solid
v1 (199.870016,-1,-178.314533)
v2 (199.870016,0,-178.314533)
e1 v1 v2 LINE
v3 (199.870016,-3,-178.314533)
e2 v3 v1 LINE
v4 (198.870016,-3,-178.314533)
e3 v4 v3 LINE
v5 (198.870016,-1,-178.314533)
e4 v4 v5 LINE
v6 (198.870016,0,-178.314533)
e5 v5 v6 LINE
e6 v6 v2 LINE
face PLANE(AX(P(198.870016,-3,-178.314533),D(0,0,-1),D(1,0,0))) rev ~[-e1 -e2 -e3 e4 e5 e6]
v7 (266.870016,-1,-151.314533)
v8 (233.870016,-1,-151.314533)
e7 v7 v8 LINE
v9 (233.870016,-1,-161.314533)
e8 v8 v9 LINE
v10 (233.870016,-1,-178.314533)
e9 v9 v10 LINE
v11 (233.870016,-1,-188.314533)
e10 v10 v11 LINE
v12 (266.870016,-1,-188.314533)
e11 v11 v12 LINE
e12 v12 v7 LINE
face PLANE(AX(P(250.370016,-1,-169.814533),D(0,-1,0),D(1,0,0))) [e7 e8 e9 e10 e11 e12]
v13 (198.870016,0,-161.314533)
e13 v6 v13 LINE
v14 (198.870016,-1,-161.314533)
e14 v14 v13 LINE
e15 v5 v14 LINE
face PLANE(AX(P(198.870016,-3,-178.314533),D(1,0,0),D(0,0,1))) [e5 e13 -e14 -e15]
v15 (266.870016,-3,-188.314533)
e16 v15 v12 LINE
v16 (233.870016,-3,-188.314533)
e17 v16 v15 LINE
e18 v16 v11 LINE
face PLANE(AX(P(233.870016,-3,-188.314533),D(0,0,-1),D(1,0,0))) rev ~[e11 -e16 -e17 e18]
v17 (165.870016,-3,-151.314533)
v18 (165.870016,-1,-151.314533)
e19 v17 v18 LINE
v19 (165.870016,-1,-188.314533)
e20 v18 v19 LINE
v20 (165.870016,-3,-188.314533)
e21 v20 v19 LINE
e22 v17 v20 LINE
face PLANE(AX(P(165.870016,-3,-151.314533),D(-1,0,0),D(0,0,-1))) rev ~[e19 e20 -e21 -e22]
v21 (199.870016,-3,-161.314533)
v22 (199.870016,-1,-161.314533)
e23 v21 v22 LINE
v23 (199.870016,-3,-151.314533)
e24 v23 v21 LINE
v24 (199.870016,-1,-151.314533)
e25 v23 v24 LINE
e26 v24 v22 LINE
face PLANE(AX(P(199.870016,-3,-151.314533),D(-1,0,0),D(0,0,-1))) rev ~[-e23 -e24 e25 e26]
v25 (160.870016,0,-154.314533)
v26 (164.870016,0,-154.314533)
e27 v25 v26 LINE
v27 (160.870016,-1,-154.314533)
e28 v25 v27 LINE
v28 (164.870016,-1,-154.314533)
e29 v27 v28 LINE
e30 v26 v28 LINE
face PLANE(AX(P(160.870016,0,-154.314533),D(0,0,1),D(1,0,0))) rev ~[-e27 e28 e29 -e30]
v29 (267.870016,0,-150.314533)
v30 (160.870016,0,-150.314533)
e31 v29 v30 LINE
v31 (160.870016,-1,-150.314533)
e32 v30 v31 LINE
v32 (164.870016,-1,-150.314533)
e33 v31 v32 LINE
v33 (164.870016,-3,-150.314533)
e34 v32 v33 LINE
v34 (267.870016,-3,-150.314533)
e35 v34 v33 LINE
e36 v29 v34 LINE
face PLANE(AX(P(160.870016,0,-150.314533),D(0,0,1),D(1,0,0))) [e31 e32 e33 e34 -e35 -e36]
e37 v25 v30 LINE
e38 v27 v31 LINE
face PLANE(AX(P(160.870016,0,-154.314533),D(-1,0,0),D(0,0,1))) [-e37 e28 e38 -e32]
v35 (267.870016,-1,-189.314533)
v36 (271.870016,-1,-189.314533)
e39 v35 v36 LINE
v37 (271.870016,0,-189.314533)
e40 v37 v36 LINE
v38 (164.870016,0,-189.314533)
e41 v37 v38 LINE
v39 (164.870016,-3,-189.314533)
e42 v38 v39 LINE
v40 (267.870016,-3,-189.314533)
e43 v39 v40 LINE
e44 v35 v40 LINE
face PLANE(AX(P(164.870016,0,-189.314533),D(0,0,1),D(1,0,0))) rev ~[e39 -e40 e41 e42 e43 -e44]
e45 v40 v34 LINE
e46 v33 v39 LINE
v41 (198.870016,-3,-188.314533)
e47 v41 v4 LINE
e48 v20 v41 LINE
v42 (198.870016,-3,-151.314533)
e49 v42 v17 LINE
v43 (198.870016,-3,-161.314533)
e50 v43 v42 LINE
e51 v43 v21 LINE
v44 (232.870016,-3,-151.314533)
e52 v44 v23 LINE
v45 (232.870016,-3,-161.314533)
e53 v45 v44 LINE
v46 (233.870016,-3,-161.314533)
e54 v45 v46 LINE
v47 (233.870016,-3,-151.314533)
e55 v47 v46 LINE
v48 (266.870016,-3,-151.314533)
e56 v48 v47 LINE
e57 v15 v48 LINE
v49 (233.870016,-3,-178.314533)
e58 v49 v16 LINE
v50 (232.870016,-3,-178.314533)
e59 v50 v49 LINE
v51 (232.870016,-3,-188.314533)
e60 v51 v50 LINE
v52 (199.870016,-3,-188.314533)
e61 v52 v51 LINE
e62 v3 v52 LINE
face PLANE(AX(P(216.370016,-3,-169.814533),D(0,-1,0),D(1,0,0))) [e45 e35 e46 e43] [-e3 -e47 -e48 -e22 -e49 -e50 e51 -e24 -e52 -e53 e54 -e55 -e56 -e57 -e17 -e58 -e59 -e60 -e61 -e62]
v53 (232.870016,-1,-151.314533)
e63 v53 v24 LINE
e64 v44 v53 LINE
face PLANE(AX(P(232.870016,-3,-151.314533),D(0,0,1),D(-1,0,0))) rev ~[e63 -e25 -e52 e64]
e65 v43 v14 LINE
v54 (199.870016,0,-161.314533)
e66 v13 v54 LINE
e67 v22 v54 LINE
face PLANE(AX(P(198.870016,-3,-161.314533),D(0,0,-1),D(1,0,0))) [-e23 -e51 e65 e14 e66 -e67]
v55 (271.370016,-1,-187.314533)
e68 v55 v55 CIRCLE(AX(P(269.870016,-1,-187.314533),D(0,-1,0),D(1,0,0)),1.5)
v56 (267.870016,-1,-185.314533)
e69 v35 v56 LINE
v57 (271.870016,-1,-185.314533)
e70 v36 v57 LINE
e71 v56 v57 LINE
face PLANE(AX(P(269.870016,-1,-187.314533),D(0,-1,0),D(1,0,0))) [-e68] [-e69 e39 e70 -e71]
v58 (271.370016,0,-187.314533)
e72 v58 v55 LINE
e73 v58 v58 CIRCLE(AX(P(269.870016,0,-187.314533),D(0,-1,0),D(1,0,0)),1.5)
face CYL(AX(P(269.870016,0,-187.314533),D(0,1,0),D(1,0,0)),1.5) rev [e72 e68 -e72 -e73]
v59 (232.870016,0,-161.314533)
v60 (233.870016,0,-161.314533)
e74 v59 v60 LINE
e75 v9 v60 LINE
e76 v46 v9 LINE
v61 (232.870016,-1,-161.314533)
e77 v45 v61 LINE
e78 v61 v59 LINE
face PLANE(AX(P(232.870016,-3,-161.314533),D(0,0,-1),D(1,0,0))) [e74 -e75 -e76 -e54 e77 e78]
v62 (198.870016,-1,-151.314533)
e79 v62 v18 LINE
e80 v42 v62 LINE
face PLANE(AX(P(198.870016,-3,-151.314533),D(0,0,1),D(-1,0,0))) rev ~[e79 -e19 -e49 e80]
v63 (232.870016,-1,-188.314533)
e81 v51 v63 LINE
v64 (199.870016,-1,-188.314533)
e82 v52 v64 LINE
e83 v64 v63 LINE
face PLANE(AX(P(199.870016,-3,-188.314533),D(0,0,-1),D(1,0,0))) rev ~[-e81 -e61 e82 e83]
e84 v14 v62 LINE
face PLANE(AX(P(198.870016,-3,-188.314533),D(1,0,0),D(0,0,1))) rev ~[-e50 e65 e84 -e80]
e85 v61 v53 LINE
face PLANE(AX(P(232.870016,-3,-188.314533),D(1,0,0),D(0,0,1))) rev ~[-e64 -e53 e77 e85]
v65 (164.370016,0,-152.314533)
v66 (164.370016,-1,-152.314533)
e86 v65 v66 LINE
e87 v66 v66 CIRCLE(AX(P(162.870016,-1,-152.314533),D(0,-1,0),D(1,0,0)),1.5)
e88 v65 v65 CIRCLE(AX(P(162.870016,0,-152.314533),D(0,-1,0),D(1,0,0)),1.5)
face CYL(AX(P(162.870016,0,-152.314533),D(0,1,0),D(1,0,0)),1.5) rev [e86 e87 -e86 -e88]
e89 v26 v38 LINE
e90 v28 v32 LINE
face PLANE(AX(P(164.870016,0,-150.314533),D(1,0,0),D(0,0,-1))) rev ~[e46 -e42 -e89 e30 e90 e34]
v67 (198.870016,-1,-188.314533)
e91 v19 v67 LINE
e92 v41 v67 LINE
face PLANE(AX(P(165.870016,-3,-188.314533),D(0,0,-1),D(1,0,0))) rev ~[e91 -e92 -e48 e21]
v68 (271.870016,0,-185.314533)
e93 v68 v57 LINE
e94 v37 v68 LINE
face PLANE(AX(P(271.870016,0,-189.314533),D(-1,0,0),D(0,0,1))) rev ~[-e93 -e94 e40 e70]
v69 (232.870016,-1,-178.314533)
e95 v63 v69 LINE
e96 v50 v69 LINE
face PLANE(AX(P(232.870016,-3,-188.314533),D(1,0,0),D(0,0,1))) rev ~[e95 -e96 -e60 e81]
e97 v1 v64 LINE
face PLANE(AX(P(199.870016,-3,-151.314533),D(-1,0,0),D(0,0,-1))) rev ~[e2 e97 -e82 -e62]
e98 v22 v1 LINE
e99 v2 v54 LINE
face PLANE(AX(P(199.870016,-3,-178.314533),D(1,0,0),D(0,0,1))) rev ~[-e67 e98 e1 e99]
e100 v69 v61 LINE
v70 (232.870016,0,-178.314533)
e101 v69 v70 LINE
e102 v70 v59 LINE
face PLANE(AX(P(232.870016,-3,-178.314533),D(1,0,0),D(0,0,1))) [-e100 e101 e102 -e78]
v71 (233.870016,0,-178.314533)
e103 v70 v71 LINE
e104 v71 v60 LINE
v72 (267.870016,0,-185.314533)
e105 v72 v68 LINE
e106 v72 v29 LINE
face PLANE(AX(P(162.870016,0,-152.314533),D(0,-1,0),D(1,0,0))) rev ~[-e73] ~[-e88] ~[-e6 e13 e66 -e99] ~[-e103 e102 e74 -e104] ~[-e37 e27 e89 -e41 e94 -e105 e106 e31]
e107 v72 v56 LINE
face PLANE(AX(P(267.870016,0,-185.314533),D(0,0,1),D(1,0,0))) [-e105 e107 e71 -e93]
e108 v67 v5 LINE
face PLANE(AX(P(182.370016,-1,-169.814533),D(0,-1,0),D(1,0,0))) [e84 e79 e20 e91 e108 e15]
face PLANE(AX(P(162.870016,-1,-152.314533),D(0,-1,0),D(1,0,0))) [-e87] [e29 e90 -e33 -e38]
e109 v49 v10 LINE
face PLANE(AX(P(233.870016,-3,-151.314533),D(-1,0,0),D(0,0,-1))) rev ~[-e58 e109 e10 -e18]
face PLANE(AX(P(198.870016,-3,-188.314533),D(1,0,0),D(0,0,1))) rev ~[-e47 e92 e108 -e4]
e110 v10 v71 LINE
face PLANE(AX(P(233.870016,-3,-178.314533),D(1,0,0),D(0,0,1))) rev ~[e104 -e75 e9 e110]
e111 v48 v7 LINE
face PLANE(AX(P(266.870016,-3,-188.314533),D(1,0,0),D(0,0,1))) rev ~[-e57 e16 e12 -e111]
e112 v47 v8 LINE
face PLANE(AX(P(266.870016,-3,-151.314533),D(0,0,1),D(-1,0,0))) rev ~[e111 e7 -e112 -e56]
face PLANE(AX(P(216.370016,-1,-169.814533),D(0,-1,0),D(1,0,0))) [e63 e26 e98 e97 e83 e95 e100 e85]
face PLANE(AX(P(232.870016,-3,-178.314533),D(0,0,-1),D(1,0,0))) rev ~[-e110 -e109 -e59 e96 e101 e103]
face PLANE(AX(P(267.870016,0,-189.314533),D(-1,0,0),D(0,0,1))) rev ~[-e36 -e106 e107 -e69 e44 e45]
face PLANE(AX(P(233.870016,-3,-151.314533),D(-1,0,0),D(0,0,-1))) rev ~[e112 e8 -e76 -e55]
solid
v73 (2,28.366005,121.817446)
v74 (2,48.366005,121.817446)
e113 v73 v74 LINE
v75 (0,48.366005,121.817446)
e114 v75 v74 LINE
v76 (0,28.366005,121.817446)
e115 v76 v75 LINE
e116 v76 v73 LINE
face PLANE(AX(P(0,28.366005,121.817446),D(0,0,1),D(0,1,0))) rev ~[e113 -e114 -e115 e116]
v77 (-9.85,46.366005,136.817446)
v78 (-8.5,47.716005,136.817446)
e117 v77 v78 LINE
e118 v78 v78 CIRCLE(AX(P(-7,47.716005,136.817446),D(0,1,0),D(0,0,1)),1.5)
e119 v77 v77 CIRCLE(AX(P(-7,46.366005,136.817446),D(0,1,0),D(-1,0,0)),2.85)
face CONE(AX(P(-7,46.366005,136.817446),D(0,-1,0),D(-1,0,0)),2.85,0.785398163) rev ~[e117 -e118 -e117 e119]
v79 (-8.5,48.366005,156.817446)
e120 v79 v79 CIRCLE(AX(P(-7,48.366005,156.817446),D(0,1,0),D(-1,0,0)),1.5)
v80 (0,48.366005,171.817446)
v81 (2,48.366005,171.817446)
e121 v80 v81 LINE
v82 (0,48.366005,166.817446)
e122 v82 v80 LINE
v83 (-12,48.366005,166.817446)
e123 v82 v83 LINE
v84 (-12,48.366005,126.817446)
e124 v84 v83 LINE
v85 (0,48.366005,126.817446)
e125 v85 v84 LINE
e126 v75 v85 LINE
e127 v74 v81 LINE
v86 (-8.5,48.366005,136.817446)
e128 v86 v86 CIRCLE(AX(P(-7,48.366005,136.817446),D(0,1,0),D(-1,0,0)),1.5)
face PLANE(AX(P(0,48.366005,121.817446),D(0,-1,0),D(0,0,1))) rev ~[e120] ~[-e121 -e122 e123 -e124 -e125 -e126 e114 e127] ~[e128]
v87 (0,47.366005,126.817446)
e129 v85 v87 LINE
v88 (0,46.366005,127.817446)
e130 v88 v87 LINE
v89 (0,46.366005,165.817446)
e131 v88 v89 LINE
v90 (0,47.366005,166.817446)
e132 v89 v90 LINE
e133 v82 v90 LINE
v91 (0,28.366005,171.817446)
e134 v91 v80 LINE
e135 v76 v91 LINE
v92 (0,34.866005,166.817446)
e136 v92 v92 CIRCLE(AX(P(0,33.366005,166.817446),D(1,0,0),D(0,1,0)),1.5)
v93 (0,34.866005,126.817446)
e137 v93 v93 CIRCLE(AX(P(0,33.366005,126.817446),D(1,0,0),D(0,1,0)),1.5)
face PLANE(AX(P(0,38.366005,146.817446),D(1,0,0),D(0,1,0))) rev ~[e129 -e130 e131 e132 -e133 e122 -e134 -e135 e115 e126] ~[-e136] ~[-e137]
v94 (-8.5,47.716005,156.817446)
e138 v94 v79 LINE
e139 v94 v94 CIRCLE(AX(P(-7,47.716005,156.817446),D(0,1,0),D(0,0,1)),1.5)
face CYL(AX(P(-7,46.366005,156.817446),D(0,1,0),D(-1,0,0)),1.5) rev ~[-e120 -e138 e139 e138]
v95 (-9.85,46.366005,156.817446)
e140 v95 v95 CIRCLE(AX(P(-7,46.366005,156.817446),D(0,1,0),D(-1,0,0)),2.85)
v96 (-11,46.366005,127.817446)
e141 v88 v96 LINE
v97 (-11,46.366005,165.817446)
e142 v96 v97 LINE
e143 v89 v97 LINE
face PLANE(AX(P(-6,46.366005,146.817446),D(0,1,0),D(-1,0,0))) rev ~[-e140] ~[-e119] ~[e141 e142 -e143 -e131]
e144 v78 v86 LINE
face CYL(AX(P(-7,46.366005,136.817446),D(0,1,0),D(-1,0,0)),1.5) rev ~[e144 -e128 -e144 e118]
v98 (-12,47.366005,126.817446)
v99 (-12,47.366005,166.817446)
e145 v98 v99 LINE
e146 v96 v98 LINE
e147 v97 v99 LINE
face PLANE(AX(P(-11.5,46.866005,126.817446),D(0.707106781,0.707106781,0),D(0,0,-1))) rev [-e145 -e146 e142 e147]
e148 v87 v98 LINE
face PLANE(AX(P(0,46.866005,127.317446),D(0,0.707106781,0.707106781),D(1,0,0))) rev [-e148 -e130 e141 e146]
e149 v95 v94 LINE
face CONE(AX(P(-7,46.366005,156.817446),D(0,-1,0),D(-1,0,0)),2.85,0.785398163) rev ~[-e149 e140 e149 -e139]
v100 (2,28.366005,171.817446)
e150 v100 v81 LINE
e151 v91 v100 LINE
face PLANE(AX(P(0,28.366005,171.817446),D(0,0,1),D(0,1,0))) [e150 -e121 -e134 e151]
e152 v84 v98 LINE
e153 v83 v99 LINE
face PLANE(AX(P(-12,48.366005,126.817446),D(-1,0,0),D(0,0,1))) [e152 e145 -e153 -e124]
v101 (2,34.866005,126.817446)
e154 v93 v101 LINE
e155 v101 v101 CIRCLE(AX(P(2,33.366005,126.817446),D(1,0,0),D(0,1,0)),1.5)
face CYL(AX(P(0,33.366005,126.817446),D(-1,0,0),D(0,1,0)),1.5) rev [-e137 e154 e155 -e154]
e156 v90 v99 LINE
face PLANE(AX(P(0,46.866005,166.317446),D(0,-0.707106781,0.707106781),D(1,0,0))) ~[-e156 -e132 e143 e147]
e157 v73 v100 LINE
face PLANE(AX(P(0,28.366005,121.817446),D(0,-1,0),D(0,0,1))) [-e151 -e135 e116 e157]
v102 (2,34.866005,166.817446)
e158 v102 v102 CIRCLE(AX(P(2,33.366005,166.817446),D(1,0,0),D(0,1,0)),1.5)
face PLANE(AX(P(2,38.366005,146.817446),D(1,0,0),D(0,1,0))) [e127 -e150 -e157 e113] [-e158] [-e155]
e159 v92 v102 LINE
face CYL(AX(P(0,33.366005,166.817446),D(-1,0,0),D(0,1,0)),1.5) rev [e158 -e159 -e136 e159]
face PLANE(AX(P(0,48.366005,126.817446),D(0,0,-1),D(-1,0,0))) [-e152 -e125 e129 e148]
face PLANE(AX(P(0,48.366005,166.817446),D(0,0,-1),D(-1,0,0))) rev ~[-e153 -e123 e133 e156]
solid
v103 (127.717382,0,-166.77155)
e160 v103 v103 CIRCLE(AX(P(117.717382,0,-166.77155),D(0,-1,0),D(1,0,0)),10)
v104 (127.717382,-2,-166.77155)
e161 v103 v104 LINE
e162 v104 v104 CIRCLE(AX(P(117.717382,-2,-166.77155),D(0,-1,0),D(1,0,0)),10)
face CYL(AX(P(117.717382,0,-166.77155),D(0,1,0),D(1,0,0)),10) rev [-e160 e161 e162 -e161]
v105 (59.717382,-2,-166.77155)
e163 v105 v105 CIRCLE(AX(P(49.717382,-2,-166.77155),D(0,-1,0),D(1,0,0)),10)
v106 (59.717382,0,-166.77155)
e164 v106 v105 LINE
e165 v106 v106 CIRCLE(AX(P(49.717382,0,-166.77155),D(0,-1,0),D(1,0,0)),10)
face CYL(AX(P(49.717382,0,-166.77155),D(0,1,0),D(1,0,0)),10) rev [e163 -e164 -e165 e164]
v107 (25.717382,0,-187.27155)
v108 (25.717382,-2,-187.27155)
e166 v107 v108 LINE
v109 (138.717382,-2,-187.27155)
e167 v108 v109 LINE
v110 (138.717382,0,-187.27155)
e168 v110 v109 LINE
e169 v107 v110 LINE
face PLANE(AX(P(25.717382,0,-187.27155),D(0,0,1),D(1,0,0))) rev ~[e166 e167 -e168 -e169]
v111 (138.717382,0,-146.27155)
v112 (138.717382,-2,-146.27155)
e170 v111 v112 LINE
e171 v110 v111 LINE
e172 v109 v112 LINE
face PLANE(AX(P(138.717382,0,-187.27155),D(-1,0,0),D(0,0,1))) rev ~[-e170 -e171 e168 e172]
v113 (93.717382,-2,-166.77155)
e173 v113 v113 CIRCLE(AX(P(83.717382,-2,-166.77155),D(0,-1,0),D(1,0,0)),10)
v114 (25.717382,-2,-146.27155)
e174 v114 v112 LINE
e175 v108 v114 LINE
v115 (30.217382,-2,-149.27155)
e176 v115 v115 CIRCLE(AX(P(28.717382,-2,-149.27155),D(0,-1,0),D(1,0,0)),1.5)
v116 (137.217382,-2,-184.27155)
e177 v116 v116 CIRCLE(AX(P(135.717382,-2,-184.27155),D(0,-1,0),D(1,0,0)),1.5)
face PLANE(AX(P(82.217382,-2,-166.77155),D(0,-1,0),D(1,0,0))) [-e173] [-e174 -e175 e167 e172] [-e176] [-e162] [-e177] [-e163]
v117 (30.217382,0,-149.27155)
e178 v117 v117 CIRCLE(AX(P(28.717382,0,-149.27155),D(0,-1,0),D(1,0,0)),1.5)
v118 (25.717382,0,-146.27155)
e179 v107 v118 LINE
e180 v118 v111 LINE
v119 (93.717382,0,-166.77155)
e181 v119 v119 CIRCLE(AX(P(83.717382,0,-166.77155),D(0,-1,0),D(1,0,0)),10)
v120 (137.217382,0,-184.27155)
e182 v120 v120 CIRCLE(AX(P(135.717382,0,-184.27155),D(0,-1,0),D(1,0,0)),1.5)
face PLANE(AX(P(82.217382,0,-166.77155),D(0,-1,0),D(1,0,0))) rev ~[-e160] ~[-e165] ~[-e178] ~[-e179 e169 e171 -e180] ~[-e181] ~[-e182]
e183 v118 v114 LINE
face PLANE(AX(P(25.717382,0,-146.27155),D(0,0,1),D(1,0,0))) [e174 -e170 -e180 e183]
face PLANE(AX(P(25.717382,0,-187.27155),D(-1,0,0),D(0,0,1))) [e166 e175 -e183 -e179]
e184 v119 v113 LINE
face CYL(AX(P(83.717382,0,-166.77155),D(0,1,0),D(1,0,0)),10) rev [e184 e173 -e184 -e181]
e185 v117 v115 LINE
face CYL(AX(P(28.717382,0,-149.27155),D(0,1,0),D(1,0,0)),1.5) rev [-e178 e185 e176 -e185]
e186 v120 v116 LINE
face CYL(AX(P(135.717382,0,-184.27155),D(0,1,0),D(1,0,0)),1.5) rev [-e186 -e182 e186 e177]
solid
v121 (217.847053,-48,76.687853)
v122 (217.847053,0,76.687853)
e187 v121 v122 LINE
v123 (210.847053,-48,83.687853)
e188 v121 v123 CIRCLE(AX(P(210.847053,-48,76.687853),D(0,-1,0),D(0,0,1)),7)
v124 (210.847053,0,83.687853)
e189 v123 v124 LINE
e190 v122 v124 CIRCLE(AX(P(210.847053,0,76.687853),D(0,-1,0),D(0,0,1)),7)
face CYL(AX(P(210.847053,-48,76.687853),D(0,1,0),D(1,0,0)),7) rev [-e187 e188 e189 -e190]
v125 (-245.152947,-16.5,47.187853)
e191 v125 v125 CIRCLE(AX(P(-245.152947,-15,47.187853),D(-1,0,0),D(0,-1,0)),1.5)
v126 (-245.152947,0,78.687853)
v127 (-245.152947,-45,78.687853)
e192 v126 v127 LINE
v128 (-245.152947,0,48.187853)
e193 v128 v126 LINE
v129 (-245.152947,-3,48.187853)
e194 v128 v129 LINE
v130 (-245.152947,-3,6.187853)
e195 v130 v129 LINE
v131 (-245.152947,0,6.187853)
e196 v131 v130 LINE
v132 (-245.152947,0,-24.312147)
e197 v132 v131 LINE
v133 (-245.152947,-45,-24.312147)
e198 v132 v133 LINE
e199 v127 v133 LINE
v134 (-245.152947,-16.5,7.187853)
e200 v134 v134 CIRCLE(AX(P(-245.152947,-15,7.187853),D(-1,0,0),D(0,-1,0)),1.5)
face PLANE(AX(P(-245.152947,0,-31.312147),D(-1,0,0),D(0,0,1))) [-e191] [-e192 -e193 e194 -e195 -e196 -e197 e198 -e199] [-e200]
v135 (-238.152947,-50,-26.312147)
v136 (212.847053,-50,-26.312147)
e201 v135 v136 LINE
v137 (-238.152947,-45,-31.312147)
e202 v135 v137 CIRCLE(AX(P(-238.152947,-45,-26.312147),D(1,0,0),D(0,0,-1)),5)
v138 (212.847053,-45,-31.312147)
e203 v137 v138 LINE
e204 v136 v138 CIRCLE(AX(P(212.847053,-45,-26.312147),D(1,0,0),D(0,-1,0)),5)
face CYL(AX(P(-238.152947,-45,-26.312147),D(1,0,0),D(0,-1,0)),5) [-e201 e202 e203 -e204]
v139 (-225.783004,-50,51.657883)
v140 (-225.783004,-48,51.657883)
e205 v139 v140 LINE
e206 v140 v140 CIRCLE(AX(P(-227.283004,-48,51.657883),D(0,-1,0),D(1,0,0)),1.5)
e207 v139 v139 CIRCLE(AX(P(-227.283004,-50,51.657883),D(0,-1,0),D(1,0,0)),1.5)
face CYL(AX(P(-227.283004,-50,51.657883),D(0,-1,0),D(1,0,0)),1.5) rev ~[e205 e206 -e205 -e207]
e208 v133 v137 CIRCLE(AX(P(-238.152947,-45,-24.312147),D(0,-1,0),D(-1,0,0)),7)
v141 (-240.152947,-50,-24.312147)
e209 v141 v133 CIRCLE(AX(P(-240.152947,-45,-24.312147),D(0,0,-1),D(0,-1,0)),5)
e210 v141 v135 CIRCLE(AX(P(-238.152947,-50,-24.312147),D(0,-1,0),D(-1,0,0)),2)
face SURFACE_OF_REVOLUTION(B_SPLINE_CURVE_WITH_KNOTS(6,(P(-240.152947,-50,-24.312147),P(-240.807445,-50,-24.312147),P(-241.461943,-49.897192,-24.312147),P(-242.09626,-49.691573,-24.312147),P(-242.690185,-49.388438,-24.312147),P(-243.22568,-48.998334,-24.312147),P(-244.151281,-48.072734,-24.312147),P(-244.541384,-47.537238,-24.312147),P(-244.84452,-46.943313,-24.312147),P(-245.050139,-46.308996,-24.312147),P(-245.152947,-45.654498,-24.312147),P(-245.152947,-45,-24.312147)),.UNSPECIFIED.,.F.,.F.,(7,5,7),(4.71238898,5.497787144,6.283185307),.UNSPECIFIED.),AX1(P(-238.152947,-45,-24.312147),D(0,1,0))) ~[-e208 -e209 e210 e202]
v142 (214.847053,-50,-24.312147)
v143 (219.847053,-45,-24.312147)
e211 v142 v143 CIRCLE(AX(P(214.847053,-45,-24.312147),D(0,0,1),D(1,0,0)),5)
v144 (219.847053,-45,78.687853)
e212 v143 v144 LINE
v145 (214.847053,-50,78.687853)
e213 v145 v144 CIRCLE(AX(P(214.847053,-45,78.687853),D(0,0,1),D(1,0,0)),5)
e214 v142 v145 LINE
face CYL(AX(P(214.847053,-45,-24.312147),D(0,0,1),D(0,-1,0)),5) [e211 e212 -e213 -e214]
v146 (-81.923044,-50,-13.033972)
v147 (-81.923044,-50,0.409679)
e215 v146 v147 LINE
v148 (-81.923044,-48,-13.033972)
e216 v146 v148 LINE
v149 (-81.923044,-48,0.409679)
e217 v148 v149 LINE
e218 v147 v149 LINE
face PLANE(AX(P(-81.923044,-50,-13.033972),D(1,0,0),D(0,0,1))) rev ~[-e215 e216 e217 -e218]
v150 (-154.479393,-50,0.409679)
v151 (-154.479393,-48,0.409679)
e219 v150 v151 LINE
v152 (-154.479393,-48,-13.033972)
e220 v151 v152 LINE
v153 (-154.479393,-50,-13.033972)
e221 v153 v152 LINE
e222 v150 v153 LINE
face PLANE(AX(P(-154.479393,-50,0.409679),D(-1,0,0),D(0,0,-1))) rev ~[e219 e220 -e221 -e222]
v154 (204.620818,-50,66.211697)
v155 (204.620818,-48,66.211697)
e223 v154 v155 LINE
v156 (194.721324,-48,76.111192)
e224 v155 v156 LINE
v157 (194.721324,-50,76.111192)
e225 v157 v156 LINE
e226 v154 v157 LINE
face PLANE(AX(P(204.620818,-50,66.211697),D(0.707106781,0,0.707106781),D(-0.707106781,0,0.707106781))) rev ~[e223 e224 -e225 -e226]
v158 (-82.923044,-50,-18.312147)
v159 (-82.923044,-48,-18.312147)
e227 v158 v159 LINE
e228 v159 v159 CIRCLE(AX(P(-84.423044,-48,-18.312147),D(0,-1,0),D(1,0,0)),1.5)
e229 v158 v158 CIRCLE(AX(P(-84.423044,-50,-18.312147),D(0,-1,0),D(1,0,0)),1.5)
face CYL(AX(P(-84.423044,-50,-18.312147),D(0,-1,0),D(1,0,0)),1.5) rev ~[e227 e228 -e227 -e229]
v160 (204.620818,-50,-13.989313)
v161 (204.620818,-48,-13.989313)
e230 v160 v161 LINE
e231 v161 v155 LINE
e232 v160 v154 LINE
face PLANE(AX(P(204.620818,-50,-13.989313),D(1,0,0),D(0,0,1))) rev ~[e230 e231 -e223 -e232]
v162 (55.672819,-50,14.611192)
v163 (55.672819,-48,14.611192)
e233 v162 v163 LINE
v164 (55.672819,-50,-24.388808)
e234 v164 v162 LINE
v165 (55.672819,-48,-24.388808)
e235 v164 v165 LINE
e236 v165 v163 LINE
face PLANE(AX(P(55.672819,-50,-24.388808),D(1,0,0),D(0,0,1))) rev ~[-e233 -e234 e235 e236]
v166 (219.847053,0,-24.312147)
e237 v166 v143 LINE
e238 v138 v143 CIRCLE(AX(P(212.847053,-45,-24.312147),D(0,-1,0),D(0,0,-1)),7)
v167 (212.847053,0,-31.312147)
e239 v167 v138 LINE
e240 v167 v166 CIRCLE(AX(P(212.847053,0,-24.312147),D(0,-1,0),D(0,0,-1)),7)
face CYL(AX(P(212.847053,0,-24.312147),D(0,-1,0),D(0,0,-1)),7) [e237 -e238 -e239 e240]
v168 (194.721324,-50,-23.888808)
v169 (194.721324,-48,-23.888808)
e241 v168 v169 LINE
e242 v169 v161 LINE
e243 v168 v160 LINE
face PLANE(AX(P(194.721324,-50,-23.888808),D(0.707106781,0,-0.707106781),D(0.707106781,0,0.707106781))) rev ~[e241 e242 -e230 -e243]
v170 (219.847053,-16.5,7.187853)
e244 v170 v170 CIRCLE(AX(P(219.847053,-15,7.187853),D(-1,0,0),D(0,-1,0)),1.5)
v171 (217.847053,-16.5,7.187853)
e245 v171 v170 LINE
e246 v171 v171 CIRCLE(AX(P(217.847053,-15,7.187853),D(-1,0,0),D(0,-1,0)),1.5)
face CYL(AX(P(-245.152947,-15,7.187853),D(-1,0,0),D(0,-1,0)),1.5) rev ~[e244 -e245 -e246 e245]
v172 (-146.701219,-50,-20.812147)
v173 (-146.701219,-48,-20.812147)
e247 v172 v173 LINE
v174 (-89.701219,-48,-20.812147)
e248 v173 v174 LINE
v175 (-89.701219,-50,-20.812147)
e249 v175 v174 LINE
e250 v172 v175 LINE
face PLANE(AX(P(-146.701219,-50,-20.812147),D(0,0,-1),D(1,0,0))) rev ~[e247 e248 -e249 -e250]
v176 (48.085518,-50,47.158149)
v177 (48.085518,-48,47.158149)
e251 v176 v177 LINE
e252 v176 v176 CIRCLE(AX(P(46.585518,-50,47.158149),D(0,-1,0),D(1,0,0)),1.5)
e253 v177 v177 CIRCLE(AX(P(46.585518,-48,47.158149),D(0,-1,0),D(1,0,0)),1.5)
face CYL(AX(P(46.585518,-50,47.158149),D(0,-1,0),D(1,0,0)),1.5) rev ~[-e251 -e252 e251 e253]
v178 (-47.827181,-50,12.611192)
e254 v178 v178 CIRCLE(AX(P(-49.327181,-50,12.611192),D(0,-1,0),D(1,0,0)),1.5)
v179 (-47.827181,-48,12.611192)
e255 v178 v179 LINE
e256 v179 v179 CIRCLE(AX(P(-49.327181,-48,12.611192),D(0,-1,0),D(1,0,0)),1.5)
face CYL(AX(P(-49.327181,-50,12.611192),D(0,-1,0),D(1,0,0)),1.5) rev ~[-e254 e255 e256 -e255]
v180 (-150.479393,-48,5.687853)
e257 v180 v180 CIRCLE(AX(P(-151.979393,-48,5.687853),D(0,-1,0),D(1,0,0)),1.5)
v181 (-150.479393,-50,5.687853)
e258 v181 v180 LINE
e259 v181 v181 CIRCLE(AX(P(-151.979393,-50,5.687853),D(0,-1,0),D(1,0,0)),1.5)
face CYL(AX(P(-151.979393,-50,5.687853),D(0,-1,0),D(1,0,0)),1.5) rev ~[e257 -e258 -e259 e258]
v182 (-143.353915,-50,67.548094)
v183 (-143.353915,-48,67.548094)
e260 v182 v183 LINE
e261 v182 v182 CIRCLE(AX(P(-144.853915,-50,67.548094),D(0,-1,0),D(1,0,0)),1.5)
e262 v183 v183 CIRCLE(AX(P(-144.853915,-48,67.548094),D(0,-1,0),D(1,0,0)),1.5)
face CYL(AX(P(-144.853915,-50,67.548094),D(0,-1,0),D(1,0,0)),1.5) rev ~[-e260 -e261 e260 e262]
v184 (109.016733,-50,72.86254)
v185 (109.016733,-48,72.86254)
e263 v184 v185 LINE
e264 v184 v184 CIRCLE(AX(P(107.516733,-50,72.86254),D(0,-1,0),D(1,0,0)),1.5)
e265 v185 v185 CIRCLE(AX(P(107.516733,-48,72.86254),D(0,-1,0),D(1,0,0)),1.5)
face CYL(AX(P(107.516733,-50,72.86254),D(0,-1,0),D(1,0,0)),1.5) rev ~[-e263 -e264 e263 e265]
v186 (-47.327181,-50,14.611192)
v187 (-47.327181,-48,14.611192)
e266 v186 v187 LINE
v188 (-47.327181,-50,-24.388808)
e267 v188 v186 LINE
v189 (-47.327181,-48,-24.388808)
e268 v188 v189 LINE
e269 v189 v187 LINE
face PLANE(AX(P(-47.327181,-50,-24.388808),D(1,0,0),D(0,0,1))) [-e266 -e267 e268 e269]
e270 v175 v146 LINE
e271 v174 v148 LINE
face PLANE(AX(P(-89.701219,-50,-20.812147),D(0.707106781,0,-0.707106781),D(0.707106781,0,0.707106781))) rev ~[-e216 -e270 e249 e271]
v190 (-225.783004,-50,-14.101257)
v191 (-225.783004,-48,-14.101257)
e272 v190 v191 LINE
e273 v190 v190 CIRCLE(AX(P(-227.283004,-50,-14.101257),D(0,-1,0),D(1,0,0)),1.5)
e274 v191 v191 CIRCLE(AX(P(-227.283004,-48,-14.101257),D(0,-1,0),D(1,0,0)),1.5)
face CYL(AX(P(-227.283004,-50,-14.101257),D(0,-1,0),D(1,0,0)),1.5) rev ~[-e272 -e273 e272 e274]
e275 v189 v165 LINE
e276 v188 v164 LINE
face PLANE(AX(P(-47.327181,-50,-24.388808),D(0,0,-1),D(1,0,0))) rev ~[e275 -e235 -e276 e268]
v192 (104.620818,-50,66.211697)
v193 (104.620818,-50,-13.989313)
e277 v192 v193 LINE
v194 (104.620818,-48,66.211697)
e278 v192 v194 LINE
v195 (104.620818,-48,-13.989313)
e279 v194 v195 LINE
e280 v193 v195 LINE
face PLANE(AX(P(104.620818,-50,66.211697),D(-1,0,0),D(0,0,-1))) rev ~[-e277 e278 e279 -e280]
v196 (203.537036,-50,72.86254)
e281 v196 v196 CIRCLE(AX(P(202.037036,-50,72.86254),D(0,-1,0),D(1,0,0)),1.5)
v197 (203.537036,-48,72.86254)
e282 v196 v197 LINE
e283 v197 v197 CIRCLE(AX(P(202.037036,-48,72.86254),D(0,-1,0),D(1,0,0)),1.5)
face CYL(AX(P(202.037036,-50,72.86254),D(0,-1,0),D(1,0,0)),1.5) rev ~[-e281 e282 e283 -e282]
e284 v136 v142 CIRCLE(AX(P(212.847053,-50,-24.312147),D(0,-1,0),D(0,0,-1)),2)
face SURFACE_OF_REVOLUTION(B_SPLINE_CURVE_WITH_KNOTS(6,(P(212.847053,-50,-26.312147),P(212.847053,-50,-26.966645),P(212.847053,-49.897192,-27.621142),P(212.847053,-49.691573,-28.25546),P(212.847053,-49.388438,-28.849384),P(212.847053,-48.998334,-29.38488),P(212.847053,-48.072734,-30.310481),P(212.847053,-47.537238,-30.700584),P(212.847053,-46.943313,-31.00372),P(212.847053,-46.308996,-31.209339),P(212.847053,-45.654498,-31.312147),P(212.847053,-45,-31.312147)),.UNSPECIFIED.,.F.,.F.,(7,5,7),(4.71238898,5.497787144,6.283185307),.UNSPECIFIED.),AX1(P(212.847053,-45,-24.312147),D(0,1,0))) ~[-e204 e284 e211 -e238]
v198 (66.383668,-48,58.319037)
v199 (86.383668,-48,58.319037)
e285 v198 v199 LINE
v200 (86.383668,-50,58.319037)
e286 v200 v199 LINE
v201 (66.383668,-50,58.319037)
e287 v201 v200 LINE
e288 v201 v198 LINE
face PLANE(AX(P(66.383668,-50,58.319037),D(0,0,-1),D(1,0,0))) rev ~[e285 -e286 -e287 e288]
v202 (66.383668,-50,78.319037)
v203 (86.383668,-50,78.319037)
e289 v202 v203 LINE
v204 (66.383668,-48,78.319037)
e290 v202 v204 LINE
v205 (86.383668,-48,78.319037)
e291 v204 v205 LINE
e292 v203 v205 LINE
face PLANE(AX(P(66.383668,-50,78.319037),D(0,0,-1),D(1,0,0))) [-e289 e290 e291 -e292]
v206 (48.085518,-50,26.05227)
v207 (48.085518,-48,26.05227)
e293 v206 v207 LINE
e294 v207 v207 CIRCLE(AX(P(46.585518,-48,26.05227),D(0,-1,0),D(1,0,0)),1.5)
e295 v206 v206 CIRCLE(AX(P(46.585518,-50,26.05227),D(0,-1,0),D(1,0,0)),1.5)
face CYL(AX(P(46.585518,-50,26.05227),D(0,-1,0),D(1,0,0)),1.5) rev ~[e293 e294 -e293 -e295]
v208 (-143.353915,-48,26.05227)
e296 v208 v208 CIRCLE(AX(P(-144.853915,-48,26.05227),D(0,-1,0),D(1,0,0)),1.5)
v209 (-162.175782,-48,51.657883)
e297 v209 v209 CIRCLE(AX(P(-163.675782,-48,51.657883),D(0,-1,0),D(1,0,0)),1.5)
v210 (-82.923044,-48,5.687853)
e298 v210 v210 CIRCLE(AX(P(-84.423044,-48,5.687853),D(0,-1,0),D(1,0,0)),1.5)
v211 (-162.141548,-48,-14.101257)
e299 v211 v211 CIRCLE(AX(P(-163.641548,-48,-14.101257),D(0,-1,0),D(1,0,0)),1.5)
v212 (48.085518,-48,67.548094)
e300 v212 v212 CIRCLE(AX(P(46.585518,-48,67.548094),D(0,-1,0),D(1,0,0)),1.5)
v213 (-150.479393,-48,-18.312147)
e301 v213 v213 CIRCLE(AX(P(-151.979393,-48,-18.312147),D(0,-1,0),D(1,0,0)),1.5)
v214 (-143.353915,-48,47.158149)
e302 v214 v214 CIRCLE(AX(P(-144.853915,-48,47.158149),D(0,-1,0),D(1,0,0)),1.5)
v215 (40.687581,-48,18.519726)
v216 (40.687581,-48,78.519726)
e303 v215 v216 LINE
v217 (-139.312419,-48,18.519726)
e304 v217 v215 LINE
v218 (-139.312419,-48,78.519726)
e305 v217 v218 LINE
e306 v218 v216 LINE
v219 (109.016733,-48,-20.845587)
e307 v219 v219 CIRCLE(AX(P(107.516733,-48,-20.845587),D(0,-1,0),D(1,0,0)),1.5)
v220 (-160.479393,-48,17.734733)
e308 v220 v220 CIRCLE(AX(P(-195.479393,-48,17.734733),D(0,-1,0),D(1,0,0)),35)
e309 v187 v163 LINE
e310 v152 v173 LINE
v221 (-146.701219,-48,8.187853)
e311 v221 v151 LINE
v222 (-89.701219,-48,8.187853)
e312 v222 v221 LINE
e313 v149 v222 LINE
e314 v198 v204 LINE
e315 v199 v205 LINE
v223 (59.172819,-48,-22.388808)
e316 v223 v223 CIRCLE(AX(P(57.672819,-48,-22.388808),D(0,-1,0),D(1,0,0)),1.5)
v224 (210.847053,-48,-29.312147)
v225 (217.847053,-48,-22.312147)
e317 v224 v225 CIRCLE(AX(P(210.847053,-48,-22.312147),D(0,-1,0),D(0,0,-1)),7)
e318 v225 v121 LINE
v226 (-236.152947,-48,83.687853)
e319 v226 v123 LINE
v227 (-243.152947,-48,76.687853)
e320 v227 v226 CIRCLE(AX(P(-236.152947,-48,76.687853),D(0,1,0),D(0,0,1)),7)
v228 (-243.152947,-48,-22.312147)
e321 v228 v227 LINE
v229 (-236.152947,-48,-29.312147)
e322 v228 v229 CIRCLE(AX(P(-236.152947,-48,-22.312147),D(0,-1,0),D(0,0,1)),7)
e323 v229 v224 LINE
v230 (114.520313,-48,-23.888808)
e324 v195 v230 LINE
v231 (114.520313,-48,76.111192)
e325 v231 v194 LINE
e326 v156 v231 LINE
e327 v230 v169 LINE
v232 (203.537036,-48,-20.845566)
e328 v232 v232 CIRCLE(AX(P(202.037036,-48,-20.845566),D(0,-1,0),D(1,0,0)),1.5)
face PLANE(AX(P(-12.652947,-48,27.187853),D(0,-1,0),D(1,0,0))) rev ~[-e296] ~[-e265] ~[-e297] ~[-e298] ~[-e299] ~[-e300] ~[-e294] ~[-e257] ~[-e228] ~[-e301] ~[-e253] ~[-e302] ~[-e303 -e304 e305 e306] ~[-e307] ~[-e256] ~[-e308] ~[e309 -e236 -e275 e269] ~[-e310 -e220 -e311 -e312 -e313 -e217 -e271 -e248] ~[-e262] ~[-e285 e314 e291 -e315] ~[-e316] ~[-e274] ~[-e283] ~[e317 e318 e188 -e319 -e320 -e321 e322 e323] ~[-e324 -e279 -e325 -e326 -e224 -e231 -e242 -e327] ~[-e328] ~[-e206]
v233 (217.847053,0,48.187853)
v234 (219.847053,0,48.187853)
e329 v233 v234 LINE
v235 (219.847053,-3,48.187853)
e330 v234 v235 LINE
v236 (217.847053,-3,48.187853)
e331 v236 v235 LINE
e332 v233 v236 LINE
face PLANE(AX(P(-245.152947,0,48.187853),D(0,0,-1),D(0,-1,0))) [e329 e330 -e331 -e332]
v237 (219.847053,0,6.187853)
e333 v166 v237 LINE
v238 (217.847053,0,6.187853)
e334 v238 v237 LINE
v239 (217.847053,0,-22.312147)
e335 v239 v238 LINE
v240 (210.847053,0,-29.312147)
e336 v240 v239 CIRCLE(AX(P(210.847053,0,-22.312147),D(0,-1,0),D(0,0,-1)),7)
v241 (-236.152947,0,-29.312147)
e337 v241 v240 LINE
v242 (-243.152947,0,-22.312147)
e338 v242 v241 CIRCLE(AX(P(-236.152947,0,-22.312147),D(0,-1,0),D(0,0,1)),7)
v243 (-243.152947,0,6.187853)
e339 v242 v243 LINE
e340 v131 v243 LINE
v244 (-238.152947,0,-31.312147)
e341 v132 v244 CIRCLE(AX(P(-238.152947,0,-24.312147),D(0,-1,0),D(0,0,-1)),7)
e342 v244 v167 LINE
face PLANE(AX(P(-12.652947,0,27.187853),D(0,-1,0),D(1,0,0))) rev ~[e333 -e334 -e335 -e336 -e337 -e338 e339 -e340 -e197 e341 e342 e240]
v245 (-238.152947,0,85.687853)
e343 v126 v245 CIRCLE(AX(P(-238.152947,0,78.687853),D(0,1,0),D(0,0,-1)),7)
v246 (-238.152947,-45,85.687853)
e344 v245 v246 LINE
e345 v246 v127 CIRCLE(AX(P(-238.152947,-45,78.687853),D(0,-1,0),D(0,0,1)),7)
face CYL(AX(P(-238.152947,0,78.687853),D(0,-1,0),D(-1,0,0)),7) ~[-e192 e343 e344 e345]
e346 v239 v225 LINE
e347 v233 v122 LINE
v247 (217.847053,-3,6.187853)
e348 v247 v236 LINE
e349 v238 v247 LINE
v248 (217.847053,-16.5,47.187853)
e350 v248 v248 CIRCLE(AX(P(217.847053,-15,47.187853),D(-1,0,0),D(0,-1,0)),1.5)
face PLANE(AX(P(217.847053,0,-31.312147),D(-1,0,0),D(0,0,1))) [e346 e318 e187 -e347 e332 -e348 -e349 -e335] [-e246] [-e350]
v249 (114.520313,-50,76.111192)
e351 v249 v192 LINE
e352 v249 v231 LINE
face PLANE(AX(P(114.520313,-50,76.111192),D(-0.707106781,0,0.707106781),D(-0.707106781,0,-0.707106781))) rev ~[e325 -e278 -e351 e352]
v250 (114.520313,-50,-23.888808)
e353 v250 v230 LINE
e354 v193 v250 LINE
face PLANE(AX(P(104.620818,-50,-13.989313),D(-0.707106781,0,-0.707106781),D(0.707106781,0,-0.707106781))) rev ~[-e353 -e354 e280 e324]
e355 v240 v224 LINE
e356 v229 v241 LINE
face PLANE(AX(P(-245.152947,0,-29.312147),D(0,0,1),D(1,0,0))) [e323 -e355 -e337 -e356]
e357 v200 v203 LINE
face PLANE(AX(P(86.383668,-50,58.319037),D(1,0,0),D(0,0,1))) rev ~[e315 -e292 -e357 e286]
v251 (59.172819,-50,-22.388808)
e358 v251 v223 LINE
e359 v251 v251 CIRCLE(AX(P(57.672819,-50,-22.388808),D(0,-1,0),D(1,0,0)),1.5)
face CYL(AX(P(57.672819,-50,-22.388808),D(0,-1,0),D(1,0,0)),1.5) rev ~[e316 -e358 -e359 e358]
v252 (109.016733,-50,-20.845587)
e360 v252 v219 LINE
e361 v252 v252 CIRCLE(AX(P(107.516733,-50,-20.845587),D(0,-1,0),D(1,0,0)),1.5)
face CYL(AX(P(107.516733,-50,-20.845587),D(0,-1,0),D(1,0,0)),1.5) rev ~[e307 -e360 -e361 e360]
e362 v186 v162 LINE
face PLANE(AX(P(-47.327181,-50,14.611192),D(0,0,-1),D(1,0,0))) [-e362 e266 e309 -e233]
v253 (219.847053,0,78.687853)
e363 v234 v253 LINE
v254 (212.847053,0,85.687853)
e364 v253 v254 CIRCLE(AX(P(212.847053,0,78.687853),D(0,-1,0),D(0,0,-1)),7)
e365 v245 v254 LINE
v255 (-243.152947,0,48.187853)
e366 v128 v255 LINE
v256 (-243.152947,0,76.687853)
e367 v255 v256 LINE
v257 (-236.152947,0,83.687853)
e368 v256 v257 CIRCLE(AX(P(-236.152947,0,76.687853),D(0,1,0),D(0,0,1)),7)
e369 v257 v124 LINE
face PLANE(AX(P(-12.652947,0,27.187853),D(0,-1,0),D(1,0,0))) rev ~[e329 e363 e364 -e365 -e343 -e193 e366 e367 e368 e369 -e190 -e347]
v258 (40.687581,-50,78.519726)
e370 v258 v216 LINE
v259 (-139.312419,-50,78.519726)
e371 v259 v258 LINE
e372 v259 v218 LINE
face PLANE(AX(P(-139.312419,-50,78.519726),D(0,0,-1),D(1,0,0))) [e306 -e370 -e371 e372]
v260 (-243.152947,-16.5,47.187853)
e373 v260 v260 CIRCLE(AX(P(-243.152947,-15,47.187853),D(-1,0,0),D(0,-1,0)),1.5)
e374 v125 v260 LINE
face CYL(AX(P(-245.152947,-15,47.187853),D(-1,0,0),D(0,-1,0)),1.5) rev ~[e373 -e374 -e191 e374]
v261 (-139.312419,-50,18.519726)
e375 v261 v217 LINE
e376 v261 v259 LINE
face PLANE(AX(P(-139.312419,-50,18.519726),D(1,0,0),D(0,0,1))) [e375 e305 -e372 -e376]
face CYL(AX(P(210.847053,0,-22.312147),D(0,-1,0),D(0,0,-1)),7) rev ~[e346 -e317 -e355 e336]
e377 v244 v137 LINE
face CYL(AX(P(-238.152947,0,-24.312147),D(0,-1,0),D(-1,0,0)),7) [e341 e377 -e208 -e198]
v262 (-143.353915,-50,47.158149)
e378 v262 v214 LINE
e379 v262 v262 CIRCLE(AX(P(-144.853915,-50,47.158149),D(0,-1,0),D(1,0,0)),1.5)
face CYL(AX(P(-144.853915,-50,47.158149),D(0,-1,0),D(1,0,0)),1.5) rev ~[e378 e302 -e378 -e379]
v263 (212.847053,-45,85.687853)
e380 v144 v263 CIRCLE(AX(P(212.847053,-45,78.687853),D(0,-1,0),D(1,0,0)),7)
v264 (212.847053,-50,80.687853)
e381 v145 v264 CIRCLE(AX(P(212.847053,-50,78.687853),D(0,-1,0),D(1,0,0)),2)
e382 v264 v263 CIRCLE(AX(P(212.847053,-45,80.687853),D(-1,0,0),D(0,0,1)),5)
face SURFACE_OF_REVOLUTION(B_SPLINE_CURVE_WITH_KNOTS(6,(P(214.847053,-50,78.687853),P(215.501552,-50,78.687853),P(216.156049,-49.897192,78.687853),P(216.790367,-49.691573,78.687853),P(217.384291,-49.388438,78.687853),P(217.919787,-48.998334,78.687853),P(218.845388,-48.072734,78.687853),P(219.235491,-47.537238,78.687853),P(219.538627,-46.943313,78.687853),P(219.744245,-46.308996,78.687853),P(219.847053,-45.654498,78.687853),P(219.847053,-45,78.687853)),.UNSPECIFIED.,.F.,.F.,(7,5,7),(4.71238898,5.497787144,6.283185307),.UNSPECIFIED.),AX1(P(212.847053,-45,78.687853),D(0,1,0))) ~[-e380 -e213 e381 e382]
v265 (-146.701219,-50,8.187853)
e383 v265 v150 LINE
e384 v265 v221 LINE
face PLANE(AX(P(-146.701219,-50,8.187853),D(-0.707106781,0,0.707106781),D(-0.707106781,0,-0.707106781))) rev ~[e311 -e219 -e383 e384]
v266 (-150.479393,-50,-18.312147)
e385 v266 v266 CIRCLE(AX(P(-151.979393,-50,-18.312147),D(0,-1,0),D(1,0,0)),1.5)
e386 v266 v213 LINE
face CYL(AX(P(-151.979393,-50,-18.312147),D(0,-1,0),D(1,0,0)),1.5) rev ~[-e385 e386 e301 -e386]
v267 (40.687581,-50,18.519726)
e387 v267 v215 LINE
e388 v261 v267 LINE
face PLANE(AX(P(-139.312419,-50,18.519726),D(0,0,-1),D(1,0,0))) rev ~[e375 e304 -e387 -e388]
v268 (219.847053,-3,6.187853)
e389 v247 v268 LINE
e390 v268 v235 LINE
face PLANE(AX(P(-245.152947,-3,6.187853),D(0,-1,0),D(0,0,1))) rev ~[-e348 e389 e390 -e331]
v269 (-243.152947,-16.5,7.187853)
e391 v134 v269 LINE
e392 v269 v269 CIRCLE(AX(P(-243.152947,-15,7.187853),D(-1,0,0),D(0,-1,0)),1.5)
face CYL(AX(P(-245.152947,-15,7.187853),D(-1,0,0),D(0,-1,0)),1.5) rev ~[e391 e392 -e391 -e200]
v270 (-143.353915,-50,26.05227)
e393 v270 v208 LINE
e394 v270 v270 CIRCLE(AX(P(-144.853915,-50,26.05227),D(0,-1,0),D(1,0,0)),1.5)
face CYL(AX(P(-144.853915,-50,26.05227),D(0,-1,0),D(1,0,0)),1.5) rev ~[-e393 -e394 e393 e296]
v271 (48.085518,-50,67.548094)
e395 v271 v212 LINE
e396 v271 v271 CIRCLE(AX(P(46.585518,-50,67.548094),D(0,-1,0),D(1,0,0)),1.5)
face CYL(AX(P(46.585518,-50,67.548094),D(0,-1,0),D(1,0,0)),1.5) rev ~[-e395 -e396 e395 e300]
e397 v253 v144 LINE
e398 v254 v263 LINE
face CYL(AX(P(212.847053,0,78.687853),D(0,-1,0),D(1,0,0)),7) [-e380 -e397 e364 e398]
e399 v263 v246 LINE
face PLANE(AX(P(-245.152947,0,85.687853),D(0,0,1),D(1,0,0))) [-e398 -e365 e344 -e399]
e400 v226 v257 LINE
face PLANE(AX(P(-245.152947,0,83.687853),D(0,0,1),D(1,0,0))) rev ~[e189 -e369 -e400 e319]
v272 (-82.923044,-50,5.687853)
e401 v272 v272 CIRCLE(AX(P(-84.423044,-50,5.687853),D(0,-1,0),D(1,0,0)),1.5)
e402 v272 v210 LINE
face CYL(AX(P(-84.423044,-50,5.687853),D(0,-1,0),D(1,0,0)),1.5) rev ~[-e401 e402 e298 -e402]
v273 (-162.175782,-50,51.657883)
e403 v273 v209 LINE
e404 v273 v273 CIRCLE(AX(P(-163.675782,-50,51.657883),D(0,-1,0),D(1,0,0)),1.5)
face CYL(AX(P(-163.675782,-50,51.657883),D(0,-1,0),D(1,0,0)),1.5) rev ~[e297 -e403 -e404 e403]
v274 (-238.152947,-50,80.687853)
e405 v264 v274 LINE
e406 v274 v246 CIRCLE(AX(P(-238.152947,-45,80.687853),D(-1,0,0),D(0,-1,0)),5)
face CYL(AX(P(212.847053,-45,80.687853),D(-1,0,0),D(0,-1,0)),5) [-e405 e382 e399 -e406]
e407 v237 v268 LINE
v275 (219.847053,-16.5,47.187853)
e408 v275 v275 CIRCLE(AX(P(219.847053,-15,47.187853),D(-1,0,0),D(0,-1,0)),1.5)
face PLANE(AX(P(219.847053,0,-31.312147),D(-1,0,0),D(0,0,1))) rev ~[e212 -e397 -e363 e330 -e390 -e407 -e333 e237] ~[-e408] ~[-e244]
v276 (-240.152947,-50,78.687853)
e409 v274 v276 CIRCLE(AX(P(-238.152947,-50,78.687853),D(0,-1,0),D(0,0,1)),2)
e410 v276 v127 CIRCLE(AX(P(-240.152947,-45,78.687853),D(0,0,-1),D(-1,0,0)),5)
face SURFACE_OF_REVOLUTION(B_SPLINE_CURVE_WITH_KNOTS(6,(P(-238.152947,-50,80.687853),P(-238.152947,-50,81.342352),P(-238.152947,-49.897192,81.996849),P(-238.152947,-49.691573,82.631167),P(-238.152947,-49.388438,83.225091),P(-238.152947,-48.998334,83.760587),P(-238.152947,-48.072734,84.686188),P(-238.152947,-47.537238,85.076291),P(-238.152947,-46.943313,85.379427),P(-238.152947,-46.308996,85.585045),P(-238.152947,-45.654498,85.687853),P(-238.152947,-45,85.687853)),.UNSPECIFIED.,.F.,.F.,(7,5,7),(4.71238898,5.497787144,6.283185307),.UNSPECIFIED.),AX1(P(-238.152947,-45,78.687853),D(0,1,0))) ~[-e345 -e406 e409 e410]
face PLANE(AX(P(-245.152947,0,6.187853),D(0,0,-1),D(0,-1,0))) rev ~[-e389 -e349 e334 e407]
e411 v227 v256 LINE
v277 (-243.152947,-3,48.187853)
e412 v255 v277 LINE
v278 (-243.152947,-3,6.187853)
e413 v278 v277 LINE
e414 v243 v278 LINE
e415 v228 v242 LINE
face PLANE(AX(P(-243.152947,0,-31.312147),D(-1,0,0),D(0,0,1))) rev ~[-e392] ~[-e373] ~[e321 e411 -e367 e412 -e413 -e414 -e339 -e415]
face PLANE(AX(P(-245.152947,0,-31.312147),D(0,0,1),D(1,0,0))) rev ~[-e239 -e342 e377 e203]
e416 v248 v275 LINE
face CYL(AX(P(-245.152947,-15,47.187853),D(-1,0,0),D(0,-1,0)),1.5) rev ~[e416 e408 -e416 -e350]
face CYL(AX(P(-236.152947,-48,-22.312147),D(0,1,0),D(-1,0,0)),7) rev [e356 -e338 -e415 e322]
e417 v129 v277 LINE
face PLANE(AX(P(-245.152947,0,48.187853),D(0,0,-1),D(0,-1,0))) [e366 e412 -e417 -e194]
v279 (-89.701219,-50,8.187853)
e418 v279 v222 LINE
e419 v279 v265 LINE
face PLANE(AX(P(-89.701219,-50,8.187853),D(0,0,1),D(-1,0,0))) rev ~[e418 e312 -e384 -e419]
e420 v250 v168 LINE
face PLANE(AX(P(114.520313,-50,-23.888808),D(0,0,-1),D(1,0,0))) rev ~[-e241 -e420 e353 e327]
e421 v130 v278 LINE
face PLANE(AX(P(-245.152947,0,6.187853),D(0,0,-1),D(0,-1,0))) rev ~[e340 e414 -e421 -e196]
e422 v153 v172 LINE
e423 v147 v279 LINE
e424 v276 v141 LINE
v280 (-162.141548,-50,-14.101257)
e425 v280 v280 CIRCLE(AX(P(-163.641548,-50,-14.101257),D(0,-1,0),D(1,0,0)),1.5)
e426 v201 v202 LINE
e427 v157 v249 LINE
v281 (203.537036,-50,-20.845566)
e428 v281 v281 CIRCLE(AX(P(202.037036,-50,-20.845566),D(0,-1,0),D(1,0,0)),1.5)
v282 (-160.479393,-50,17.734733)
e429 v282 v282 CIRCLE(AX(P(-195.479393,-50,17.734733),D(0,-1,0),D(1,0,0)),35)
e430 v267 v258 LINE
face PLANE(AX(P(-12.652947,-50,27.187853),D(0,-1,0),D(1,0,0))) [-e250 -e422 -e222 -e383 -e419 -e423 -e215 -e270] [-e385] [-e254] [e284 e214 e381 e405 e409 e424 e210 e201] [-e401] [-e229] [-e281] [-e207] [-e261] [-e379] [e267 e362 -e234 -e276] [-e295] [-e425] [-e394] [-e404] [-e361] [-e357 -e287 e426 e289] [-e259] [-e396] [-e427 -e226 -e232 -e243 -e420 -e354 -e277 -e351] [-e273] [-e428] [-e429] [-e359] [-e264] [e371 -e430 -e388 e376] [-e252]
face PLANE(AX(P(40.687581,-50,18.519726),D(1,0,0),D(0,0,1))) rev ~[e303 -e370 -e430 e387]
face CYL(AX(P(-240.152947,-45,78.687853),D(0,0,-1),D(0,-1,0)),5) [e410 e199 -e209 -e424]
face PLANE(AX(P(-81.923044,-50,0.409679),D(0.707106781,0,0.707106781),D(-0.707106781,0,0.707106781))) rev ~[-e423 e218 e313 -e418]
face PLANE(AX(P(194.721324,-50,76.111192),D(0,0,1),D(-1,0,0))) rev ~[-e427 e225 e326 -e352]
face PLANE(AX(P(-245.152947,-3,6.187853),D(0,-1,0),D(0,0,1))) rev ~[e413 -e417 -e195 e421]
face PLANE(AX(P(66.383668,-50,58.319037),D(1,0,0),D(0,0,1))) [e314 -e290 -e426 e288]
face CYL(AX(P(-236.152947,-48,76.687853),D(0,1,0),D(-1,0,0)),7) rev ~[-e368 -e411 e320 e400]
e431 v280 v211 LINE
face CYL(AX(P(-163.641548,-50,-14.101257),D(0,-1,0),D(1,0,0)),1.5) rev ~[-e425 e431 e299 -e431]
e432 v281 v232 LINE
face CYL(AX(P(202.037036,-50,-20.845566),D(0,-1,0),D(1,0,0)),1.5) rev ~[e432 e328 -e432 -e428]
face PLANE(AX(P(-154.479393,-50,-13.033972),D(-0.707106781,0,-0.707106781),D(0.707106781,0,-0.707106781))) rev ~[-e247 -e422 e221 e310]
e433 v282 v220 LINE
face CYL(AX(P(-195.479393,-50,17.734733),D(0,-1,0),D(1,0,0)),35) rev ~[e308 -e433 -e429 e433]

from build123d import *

# Parameters (mm, degrees)
F0_W            = 465
F0_H            = 117
F1_DEPTH        = 50
F2_T            = -2
F4_R            = 7
F3_W            = 180
F3_H            = 60
F3_W_2          = 20
F3_H_2          = 20
F3_R            = 1.5
F3_W_3          = 93
F3_H_3          = 36
F3_R_2          = 9.5
F3_R_3          = 35
F3_W_4          = 103
F3_H_4          = 39
F5_DEPTH        = 25
F6_R            = 5
F8_R            = 1.5
F8_W            = 3
F8_H            = 42
F9_DEPTH        = 500
F10_W           = 20
F10_H           = 50
F10_R           = 1.5
F11_DEPTH       = 2
F12_W           = 12
F12_H           = 40
F13_DEPTH       = 2
F15_D           = 3
F15_CSINK_D     = 5.7
F15_CSINK_ANGLE = 90
F16_SIZE        = 1
F17_W           = 113
F17_H           = 41
F17_R           = 1.5
F17_R_2         = 10
F18_DEPTH       = 2
F20_DEPTH       = 3
F19_W           = 4
F19_H           = 4
F19_R           = 1.5
F21_DEPTH       = 1
F23_DEPTH       = 2
F22_W           = 1
F22_H           = 17
F24_DEPTH       = 3


with BuildPart() as f1:
    # F0 (on Front) → F1 (new body)
    with BuildSketch(Plane.XZ):
        with Locations((-12.6529467106, 27.1878533959)):
            Rectangle(F0_W, F0_H)
    extrude(amount=F1_DEPTH)

    # F2
    f2_openings = [f1.faces().sort_by_distance(p)[0] for p in [
        (-12.652947, 0, 27.187853),
    ]]
    offset(amount=F2_T, openings=f2_openings)

    # F4
    f4_edges = [f1.edges().sort_by_distance(p)[0] for p in [
        (-245.152947, -25, 85.687853),
        (219.847053, -25, 85.687853),
        (219.847053, -25, -31.312147),
        (-245.152947, -25, -31.312147),
        (-243.152947, -24, 83.687853),
        (-243.152947, -24, -29.312147),
        (217.847053, -24, -29.312147),
        (217.847053, -24, 83.687853),
    ]]
    fillet(f4_edges, radius=F4_R)

    # F3 (on face) → F5 (cut)
    with BuildSketch(Plane.XZ.offset(50)):
        with Locations((-49.312419115, 48.5197262004)):
            Rectangle(F3_W, F3_H)
        with Locations((76.3836680665, 68.3190373614)):
            Rectangle(F3_W_2, F3_H_2)
        Polygon((194.7213235501, 76.111191912), (114.5203134233, 76.111191912), (104.6208184867, 66.2116969754), (104.6208184867, -13.9893131514), (114.5203134233, -23.888808088), (194.7213235501, -23.888808088), (204.6208184867, -13.9893131514), (204.6208184867, 66.2116969754), align=None)
        with Locations((46.5855184052, 67.5480939005)):
            Circle(F3_R)
        with Locations((46.5855184052, 47.158148972)):
            Circle(F3_R)
        with Locations((46.5855184052, 26.052269754)):
            Circle(F3_R)
        with Locations((107.5167332374, 72.8625404379)):
            Circle(F3_R)
        with Locations((93.1539236558, -72.7683771119)):
            Rectangle(F3_W_3, F3_H_3)
        with Locations((63.5958272868, -74.4846176776)):
            Circle(F3_R_2, mode=Mode.SUBTRACT)
        with Locations((93.6227975534, -74.4846176776)):
            Circle(F3_R_2, mode=Mode.SUBTRACT)
        with Locations((50.6539236558, -58.7683771119)):
            Circle(F3_R, mode=Mode.SUBTRACT)
        with Locations((135.6539236558, -86.7683771119)):
            Circle(F3_R, mode=Mode.SUBTRACT)
        with Locations((123.0111705607, -74.4846176776)):
            Circle(F3_R_2, mode=Mode.SUBTRACT)
        Polygon((-89.7012186204, 8.1878533959), (-146.7012186204, 8.1878533959), (-154.4793932134, 0.4096788029), (-154.4793932134, -13.033972011), (-146.7012186204, -20.8121466041), (-89.7012186204, -20.8121466041), (-81.9230440273, -13.033972011), (-81.9230440273, 0.4096788029), align=None)
        with Locations((-151.9793932134, 5.6878533959)):
            Circle(F3_R)
        with Locations((-151.9793932134, -18.3121466041)):
            Circle(F3_R)
        with Locations((-84.4230440273, 5.6878533959)):
            Circle(F3_R)
        with Locations((-84.4230440273, -18.3121466041)):
            Circle(F3_R)
        with Locations((107.5167332374, -20.8455865502)):
            Circle(F3_R)
        with Locations((202.0370356229, -20.8455660029)):
            Circle(F3_R)
        with Locations((202.0370356229, 72.8625404379)):
            Circle(F3_R)
        with Locations((-195.4793932134, 17.7347333959)):
            Circle(F3_R_3)
        with Locations((-144.8539147958, 67.5480939005)):
            Circle(F3_R)
        with Locations((-144.8539147958, 47.158148972)):
            Circle(F3_R)
        with Locations((-144.8539147958, 26.052269754)):
            Circle(F3_R)
        with Locations((-227.2830040105, 51.6578833959)):
            Circle(F3_R)
        with Locations((-227.2830040105, -14.1012566041)):
            Circle(F3_R)
        with Locations((-163.6415483004, -14.1012566041)):
            Circle(F3_R)
        with Locations((-163.6757824164, 51.6578833959)):
            Circle(F3_R)
        with Locations((-49.3271809206, 12.611191912)):
            Circle(F3_R)
        with Locations((57.6728190794, -22.388808088)):
            Circle(F3_R)
        with Locations((4.1728190794, -4.888808088)):
            Rectangle(F3_W_4, F3_H_4)
    extrude(amount=-F5_DEPTH, mode=Mode.SUBTRACT)

    # F6
    f6_edges = [f1.edges().sort_by_distance(p)[0] for p in [
        (217.796801, -50, 83.637601),
    ]]
    fillet(f6_edges, radius=F6_R)

    # F8 (on face) → F9 (cut)
    with BuildSketch(Plane(origin=(-245.1529467106, 0, 0), x_dir=(0, -1, 0), z_dir=(-1, 0, 0))):
        with Locations((15, 47.1878533959)):
            Circle(F8_R)
        with Locations((15, 7.1878533959)):
            Circle(F8_R)
        with Locations((1.5, 27.1878533959)):
            Rectangle(F8_W, F8_H)
    extrude(amount=-F9_DEPTH, mode=Mode.SUBTRACT)


with BuildPart() as f11:
    # F10 (on Right) → F11 (new body)
    with BuildSketch(Plane.YZ):
        with Locations((38.3660052121, 146.8174463511)):
            Rectangle(F10_W, F10_H)
        with Locations((33.3660052121, 126.8174463511)):
            Circle(F10_R, mode=Mode.SUBTRACT)
        with Locations((33.3660052121, 166.8174463511)):
            Circle(F10_R, mode=Mode.SUBTRACT)
    extrude(amount=F11_DEPTH)

    # F12 (on face) → F13 (join)
    with BuildSketch(Plane(origin=(0, 48.3660052121, 0), x_dir=(-1, 0, 0), z_dir=(0, 1, 0))):
        with Locations((6, 146.8174463511)):
            Rectangle(F12_W, F12_H)
    extrude(amount=-F13_DEPTH)

    # F15 (through all)
    with Locations(Plane.XZ.offset(-46.3660052121)):
        with Locations((-7, 156.8174463511), (-7, 136.8174463511)):
            CounterSinkHole(F15_D / 2, F15_CSINK_D / 2, counter_sink_angle=F15_CSINK_ANGLE)

    # F16
    f16_edges = [f11.edges().sort_by_distance(p)[0] for p in [
        (-6, 46.366005, 166.817446),
        (-12, 46.366005, 146.817446),
        (-6, 46.366005, 126.817446),
    ]]
    chamfer(f16_edges, length=F16_SIZE)


with BuildPart() as f18:
    # F17 (on Front) → F18 (new body)
    with BuildSketch(Plane.XZ):
        with Locations((82.2173821926, -166.7715502977)):
            Rectangle(F17_W, F17_H)
        with Locations((135.7173821926, -184.2715502977)):
            Circle(F17_R, mode=Mode.SUBTRACT)
        with Locations((49.7173821926, -166.7715502977)):
            Circle(F17_R_2, mode=Mode.SUBTRACT)
        with Locations((28.7173821926, -149.2715502977)):
            Circle(F17_R, mode=Mode.SUBTRACT)
        with Locations((83.7173821926, -166.7715502977)):
            Circle(F17_R_2, mode=Mode.SUBTRACT)
        with Locations((117.7173821926, -166.7715502977)):
            Circle(F17_R_2, mode=Mode.SUBTRACT)
    extrude(amount=F18_DEPTH)


with BuildPart() as f20:
    # F19 (on Front) → F20 (new body)
    with BuildSketch(Plane.XZ):
        Polygon((267.8700156212, -150.314532876), (164.8700156212, -150.314532876), (164.8700156212, -154.314532876), (164.8700156212, -189.314532876), (267.8700156212, -189.314532876), (267.8700156212, -185.314532876), align=None)
    extrude(amount=F20_DEPTH)

    # F19 (on Front) → F21 (join)
    with BuildSketch(Plane.XZ):
        with Locations((162.8700156212, -152.314532876)):
            Rectangle(F19_W, F19_H)
        with Locations((162.8700156212, -152.314532876)):
            Circle(F19_R, mode=Mode.SUBTRACT)
        with Locations((269.8700156212, -187.314532876)):
            Rectangle(F19_W, F19_H)
        with Locations((269.8700156212, -187.314532876)):
            Circle(F19_R, mode=Mode.SUBTRACT)
    extrude(amount=F21_DEPTH)

    # F22 (on face) → F23 (cut)
    with BuildSketch(Plane.XZ.offset(3)):
        Polygon((198.8700156212, -151.314532876), (165.8700156212, -151.314532876), (165.8700156212, -188.314532876), (198.8700156212, -188.314532876), (198.8700156212, -178.314532876), (198.8700156212, -161.314532876), align=None)
        Polygon((199.8700156212, -151.314532876), (199.8700156212, -161.314532876), (199.8700156212, -178.314532876), (199.8700156212, -188.314532876), (232.8700156212, -188.314532876), (232.8700156212, -178.314532876), (232.8700156212, -161.314532876), (232.8700156212, -151.314532876), align=None)
        Polygon((233.8700156212, -151.314532876), (233.8700156212, -161.314532876), (233.8700156212, -178.314532876), (233.8700156212, -188.314532876), (266.8700156212, -188.314532876), (266.8700156212, -151.314532876), align=None)
    extrude(amount=-F23_DEPTH, mode=Mode.SUBTRACT)

    # F22 (on face) → F24 (cut)
    with BuildSketch(Plane.XZ.offset(3)):
        with Locations((199.3700156212, -169.814532876)):
            Rectangle(F22_W, F22_H)
        with Locations((233.3700156212, -169.814532876)):
            Rectangle(F22_W, F22_H)
    extrude(amount=-F24_DEPTH, mode=Mode.SUBTRACT)


solid = Compound([f1.part, f11.part, f18.part, f20.part])
